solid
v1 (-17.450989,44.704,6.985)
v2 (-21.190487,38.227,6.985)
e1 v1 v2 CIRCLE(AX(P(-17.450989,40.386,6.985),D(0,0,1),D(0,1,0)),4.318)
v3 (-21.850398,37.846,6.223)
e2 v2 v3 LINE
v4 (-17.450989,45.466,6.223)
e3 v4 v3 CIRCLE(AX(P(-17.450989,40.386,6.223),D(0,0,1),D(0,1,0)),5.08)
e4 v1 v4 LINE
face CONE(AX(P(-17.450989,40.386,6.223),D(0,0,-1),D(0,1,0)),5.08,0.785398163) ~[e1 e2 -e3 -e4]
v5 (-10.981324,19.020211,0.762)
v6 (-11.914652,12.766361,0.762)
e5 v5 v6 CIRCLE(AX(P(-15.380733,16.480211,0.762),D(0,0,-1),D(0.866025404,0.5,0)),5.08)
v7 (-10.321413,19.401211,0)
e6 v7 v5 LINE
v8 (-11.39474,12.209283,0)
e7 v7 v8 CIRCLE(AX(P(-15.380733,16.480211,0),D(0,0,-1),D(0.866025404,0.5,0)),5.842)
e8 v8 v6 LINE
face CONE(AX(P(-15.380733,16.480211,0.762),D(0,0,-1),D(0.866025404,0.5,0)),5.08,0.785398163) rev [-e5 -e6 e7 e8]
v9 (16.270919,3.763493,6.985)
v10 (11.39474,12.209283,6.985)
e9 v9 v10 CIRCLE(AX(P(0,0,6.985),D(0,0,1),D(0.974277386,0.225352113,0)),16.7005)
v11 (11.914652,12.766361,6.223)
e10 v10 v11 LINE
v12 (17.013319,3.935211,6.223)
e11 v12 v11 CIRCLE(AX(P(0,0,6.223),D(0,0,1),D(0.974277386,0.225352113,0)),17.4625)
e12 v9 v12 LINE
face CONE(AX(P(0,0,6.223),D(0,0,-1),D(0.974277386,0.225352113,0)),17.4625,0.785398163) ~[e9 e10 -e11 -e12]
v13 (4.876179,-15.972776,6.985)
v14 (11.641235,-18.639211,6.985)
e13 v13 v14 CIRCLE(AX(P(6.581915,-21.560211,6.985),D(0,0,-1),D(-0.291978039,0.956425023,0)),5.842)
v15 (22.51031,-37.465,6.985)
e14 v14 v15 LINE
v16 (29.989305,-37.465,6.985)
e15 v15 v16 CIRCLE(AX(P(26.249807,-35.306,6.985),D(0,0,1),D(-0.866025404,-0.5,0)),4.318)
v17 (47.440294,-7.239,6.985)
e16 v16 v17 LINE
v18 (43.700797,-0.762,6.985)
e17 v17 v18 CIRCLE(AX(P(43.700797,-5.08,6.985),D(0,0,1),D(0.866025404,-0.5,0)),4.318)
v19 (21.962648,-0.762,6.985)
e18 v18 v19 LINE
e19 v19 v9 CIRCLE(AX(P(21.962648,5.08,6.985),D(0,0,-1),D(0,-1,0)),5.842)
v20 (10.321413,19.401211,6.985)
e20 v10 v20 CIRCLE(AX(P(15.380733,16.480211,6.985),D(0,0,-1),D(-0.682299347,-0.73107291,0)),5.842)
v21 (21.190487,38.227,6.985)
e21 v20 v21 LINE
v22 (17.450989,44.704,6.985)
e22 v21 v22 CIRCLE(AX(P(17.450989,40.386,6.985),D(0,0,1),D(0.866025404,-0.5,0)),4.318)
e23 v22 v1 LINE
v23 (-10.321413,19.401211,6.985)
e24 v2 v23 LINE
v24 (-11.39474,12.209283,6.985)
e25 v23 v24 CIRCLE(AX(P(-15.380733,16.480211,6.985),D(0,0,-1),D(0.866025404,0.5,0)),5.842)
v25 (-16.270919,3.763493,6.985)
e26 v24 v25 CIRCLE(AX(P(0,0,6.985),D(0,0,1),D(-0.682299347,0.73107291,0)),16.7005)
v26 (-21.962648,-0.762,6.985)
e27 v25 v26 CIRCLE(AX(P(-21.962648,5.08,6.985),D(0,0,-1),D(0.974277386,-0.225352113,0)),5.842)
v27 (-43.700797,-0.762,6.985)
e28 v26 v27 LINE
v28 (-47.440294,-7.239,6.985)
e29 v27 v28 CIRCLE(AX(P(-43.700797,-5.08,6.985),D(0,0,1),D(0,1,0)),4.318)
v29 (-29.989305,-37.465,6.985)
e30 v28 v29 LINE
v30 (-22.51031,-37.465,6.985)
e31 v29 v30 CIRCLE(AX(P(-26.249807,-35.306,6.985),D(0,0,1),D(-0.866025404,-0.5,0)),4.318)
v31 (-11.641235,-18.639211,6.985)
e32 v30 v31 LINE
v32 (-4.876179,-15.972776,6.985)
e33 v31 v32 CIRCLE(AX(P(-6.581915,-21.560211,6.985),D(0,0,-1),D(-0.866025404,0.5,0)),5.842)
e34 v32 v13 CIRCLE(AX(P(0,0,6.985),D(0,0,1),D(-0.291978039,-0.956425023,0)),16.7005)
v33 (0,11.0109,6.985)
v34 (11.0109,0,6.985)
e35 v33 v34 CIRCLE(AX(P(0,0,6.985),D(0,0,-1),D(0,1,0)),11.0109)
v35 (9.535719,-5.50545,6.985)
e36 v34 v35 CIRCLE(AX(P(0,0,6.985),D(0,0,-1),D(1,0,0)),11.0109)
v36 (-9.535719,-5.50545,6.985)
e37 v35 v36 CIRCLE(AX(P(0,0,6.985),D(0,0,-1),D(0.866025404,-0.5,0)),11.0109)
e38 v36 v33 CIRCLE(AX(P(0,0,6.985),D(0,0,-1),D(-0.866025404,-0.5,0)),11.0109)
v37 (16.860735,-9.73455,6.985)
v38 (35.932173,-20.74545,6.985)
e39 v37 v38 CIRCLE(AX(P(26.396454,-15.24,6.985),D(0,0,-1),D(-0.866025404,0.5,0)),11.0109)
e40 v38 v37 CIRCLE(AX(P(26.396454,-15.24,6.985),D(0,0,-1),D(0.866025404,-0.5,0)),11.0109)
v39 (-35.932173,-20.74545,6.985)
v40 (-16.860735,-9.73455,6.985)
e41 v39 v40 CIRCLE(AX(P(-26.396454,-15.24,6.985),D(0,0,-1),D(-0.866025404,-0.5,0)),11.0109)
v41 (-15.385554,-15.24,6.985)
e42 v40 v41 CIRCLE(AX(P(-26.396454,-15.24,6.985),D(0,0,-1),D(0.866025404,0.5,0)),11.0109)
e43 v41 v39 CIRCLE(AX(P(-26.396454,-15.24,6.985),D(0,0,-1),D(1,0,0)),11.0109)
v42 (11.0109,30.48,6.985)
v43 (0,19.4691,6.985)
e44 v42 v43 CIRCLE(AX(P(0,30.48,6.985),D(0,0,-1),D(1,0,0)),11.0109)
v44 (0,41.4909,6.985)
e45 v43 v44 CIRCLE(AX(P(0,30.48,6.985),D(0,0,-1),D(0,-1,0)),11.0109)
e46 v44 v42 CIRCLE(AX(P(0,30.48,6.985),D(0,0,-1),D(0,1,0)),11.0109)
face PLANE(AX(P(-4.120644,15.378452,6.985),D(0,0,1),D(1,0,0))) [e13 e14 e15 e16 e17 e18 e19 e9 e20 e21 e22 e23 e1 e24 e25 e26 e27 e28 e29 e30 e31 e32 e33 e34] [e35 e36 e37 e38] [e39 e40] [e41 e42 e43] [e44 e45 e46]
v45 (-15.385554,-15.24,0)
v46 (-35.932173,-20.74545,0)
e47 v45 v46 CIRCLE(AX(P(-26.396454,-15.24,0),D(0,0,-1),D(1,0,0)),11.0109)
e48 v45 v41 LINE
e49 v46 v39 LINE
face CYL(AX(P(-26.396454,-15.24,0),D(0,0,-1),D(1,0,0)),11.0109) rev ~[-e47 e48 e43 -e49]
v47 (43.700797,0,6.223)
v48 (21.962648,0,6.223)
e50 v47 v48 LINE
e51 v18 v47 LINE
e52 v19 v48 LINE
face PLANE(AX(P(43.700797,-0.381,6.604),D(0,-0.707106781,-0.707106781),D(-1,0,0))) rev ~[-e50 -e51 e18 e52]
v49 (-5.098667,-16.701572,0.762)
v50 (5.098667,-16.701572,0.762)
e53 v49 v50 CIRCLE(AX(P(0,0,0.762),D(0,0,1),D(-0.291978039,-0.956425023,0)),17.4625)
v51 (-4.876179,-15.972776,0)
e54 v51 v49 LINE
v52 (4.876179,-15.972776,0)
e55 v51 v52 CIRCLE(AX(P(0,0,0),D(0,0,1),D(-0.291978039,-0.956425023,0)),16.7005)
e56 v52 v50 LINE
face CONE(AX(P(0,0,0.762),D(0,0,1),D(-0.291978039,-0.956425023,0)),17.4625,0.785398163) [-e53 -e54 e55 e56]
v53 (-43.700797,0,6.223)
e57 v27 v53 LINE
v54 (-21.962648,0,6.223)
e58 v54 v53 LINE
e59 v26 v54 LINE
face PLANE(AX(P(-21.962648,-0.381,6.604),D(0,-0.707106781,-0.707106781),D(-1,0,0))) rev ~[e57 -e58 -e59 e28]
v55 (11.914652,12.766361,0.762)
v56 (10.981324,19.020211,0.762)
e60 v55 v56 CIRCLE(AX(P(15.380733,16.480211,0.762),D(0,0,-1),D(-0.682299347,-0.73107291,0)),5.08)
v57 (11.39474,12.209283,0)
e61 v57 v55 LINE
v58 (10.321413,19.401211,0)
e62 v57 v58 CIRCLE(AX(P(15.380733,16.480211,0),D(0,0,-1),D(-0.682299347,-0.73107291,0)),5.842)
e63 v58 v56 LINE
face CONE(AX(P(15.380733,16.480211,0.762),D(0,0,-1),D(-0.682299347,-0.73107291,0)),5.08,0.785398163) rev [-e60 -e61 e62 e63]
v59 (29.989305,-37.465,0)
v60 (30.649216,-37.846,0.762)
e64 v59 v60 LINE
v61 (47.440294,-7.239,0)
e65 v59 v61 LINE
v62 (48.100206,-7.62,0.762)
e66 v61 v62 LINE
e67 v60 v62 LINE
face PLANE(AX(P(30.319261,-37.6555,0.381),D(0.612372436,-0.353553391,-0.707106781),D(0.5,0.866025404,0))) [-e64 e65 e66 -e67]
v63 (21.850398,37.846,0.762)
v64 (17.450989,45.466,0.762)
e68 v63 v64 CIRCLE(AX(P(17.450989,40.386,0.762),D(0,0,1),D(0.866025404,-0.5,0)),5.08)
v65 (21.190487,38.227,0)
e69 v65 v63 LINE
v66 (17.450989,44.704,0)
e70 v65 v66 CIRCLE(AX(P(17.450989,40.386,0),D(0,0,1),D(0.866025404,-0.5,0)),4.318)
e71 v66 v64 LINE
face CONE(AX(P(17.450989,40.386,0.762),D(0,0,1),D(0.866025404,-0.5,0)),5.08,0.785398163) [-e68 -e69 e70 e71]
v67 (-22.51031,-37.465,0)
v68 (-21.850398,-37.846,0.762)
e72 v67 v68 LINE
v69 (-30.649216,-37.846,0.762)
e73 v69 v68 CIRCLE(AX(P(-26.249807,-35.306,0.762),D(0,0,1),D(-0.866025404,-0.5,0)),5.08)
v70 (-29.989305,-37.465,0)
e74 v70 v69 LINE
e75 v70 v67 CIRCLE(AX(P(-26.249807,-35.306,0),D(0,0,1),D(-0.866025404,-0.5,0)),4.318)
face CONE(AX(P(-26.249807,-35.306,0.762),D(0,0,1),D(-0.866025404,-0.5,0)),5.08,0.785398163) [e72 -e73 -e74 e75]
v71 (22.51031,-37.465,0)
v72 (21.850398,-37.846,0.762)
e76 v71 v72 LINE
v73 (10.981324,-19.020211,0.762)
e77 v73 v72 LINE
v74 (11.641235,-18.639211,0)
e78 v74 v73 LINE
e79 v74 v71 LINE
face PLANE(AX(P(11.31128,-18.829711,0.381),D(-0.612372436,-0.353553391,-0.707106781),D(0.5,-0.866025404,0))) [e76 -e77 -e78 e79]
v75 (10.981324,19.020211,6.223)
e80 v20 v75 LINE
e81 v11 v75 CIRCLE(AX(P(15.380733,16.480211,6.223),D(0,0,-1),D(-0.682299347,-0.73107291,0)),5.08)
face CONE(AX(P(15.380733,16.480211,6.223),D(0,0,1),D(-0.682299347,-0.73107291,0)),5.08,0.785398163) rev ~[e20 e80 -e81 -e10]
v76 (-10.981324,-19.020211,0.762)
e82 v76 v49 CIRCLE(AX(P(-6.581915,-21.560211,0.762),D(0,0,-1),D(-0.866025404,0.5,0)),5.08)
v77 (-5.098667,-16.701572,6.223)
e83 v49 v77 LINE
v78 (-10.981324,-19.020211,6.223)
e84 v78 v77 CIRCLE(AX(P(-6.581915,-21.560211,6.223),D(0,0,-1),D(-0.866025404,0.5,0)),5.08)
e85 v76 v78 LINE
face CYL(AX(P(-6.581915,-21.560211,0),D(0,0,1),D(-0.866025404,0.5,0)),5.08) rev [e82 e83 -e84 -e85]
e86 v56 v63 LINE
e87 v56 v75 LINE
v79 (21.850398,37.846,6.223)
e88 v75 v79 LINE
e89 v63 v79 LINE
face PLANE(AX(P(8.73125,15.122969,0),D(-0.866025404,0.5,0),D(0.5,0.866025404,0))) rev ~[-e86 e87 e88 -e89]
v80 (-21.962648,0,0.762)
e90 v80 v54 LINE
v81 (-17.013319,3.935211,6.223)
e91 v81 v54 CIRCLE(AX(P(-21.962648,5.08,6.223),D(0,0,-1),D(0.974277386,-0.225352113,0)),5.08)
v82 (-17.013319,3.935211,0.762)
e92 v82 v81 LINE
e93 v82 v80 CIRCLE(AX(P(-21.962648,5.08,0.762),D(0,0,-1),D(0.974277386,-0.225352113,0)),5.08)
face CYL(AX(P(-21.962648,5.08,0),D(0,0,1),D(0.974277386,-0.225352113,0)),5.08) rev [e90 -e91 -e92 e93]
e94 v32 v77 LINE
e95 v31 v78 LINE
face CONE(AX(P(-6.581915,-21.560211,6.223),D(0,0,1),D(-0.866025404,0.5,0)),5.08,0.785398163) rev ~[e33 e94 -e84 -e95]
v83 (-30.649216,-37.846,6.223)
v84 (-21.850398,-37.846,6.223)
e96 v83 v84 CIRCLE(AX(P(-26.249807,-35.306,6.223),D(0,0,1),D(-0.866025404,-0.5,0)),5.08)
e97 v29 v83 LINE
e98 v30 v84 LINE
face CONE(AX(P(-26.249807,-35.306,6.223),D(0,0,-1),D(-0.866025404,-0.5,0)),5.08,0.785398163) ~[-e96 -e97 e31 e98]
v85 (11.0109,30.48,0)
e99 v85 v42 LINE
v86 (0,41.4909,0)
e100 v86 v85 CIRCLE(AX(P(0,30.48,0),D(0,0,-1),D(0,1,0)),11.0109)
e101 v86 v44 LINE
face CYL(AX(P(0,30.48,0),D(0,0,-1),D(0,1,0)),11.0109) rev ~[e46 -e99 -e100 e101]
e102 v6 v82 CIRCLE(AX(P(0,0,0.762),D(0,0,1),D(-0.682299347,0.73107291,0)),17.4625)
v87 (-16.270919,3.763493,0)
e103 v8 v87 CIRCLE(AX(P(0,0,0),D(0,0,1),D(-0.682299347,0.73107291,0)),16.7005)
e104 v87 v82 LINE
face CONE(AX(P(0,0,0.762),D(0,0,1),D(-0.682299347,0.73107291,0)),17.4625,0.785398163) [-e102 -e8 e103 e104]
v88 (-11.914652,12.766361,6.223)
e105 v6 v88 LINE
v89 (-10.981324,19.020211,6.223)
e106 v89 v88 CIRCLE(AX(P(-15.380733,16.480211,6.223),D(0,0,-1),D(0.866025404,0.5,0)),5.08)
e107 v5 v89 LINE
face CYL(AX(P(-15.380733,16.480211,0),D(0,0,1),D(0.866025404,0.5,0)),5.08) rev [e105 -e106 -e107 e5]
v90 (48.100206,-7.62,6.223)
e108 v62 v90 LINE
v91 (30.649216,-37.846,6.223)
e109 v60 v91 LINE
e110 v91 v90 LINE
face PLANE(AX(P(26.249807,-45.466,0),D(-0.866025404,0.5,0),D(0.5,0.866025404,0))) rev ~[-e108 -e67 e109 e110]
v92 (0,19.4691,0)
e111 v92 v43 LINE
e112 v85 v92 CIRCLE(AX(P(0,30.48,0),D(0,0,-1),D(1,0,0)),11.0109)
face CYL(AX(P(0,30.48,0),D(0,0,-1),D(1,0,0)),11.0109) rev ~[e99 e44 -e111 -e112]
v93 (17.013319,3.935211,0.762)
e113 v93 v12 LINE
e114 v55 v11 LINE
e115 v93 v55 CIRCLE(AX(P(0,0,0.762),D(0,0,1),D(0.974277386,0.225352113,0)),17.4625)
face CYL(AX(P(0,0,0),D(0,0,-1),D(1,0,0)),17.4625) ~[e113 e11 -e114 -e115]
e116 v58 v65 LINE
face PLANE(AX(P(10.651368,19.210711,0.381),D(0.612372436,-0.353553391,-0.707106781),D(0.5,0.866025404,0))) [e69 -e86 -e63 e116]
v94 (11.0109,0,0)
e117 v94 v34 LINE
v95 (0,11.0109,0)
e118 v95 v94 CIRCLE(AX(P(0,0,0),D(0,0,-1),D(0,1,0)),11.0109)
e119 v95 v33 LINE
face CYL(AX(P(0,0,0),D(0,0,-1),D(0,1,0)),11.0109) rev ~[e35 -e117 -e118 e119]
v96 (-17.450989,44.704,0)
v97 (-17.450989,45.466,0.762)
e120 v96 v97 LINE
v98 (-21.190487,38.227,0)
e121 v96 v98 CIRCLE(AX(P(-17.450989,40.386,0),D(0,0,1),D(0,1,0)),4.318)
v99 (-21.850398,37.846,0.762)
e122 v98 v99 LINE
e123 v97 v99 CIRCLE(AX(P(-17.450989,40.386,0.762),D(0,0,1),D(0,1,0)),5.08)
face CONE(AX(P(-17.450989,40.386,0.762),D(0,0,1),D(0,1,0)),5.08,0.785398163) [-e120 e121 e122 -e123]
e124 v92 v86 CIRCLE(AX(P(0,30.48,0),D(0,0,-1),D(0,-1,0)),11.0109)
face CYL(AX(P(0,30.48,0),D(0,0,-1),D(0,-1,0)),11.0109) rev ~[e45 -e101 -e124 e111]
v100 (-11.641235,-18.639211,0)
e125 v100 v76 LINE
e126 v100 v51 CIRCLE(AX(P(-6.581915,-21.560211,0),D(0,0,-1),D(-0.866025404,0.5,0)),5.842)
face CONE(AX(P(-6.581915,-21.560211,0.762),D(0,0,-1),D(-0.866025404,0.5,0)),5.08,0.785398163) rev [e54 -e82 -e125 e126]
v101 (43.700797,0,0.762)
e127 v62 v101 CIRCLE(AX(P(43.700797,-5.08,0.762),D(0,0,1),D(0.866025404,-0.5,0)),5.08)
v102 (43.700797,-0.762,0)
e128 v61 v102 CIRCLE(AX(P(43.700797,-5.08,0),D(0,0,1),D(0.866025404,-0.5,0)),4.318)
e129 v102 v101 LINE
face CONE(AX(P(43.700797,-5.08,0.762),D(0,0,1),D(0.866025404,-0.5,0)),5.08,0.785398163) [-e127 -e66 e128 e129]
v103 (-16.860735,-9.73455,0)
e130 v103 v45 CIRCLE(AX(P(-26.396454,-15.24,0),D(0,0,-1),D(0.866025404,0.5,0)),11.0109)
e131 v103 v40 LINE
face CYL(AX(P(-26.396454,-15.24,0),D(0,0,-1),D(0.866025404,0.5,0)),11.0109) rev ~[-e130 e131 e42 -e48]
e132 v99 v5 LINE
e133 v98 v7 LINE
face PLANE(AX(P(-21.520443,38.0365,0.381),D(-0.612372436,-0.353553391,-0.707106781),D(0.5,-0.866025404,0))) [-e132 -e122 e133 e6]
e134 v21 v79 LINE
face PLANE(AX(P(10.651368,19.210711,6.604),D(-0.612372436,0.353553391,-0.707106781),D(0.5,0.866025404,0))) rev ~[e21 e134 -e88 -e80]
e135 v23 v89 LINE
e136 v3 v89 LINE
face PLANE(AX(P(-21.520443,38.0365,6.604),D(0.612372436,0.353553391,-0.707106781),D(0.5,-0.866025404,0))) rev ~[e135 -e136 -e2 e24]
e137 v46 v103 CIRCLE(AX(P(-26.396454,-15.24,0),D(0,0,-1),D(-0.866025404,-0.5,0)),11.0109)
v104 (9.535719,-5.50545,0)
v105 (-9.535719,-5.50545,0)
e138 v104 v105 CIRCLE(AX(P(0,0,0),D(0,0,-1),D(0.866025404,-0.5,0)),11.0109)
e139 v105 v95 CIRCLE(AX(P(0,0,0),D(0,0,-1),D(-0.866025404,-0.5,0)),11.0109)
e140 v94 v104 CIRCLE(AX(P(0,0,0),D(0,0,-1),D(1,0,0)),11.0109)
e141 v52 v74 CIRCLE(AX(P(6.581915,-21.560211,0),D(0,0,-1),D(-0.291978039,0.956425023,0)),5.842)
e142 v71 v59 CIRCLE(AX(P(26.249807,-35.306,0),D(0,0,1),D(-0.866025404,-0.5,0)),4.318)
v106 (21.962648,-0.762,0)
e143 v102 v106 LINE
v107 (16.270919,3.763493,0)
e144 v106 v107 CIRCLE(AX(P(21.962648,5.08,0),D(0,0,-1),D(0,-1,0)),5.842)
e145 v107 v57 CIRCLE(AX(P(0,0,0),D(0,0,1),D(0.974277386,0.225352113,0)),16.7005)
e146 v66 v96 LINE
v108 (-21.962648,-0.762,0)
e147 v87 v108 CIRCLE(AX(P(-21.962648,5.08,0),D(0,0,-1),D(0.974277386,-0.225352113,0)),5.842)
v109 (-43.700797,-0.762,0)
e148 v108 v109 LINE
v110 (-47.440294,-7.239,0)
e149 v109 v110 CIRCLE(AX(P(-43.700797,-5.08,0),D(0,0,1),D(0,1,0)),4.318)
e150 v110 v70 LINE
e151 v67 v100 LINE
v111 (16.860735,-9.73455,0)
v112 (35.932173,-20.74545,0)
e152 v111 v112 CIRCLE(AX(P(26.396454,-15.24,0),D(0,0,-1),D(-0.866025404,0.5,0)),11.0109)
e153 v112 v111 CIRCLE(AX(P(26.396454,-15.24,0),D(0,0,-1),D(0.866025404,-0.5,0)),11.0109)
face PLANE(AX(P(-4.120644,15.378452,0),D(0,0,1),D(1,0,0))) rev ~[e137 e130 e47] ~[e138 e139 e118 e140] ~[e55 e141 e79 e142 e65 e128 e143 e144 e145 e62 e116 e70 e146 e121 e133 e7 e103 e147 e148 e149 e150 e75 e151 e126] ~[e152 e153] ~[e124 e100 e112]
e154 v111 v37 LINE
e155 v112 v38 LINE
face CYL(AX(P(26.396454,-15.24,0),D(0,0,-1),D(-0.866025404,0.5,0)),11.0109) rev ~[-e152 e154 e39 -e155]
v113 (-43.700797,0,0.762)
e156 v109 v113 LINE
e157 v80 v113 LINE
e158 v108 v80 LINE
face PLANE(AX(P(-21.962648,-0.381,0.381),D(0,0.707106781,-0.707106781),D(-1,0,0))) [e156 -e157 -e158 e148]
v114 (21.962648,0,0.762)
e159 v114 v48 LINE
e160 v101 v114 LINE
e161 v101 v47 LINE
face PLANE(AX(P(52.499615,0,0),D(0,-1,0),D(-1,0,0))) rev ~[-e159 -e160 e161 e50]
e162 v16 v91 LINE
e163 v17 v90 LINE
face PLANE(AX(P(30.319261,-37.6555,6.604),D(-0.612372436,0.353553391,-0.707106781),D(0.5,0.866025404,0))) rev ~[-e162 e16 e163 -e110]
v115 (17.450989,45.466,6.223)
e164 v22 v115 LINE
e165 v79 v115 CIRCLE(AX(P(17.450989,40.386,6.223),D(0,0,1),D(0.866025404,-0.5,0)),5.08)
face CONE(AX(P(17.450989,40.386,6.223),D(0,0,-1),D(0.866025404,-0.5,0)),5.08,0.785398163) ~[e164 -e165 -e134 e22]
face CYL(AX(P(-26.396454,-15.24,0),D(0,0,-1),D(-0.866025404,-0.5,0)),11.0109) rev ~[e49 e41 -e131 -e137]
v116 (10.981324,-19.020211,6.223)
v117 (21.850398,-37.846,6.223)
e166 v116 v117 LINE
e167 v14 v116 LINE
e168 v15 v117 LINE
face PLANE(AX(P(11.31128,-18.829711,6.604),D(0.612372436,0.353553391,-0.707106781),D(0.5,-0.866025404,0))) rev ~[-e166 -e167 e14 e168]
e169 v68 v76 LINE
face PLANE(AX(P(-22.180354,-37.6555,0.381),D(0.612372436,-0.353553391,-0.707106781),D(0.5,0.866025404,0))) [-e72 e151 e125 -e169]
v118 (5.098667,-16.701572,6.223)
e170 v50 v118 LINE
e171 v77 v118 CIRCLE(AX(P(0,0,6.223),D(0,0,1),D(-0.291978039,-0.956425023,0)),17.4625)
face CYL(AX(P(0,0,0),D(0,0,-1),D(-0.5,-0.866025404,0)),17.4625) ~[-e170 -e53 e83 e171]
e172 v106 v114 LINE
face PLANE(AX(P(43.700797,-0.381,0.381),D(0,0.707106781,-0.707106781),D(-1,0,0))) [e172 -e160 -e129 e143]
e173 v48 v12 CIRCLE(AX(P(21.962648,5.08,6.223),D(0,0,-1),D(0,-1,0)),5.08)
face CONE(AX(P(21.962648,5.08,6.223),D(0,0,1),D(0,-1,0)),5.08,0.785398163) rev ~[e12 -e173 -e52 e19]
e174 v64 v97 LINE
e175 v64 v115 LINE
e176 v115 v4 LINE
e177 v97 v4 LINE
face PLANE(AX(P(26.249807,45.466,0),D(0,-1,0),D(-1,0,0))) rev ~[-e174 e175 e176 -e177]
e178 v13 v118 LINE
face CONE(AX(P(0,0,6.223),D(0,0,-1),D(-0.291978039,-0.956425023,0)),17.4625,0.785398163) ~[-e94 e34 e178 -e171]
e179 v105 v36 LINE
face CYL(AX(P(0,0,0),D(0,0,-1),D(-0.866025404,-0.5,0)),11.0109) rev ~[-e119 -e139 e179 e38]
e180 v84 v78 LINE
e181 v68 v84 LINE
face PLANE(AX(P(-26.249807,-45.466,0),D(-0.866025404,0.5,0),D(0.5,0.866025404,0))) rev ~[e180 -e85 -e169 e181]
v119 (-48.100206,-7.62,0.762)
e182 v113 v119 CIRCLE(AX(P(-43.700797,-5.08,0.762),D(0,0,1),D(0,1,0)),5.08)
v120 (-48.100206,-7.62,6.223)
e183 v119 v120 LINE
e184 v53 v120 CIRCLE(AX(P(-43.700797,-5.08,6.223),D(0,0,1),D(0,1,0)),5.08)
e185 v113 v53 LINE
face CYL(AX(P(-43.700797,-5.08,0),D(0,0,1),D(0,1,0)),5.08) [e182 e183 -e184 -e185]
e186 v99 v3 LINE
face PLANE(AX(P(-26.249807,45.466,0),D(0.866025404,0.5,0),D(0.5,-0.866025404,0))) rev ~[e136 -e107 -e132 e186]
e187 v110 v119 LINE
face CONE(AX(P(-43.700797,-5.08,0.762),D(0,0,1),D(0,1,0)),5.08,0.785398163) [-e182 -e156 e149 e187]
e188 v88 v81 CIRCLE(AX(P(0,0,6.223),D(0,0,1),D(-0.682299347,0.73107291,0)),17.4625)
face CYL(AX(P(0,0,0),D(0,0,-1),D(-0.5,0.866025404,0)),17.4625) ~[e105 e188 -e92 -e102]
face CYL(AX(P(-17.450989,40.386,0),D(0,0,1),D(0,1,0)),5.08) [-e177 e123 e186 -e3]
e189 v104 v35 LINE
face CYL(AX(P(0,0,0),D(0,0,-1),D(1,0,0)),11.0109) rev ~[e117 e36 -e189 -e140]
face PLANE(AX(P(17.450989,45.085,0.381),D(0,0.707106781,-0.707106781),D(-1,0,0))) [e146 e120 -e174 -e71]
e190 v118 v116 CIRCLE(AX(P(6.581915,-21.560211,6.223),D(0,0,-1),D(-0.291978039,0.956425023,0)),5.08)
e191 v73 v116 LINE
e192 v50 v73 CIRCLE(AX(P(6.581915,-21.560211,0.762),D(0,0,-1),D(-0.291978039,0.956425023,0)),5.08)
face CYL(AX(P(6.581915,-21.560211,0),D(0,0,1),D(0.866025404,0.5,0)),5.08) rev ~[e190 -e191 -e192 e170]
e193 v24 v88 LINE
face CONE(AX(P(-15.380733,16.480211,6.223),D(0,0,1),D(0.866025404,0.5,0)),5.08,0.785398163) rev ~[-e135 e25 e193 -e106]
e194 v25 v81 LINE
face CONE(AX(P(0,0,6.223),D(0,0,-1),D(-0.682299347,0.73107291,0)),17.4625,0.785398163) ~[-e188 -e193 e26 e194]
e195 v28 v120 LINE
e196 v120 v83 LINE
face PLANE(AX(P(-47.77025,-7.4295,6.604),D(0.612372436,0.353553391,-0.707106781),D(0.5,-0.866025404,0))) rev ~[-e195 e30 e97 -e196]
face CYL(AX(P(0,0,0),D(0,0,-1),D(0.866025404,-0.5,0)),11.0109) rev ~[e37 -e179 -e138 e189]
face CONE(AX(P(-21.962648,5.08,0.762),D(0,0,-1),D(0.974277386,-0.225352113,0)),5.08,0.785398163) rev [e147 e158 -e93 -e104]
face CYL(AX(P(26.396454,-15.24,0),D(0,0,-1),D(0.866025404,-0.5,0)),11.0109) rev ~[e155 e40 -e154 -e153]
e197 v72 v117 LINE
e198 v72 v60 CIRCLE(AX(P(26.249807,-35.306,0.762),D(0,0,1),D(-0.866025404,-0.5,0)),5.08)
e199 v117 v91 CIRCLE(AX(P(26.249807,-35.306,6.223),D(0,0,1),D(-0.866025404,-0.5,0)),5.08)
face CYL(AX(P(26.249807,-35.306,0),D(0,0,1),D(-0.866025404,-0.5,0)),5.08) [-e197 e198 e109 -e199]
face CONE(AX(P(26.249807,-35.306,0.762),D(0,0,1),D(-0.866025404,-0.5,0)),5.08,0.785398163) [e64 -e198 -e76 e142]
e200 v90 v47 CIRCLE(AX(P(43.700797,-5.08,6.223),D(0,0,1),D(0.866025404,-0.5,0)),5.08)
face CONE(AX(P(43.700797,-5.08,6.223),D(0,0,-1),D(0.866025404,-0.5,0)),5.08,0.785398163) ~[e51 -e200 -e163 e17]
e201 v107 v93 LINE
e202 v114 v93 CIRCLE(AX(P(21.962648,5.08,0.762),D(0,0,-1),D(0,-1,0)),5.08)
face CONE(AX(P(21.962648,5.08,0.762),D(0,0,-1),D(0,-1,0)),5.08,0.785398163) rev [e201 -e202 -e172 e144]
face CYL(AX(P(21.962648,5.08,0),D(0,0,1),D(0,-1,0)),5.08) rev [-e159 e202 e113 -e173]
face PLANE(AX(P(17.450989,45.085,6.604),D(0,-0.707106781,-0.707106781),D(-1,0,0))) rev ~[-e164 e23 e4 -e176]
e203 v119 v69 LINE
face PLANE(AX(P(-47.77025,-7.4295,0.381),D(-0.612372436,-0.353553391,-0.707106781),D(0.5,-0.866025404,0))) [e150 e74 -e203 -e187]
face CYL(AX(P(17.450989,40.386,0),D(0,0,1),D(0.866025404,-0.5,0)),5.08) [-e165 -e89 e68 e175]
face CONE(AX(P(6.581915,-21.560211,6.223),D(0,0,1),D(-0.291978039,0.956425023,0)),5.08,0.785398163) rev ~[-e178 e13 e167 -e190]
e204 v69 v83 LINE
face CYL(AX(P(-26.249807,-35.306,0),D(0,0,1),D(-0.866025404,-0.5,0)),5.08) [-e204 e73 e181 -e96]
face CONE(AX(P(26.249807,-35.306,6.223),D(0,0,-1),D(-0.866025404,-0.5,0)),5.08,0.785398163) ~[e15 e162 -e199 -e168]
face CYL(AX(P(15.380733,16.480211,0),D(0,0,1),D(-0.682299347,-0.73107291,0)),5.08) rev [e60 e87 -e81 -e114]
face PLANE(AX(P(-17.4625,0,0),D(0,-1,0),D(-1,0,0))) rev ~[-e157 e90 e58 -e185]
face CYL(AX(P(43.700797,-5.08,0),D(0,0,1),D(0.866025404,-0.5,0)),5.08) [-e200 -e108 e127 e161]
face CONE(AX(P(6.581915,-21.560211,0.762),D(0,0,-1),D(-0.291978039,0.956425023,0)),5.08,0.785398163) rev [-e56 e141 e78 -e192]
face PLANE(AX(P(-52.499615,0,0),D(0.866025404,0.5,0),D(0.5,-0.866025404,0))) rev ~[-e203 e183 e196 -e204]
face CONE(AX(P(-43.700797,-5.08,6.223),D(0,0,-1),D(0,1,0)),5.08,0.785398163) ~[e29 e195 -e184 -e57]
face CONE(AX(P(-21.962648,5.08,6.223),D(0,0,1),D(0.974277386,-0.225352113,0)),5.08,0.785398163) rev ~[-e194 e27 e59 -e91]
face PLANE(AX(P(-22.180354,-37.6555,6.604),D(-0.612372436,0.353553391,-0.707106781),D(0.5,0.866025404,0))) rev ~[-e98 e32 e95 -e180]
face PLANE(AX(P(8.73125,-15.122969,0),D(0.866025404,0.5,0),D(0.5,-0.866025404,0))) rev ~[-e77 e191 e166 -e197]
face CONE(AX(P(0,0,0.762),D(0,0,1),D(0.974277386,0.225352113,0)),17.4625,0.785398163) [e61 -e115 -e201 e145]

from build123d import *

# Parameters (mm, degrees)
F1_DEPTH = 6.985
F2_R     = 5.08
F3_SIZE  = 0.762


with BuildPart() as f1:
    # F0 (on Top) → F1 (new body)
    with BuildSketch(Plane.XY):
        with BuildLine():
            ThreePointArc((-7.41045, 12.8352759069), (-3.8359311856, 14.3158900788), (0, 14.8209))
            Line((0, 14.8209), (0, 17.4625))
            ThreePointArc((0, 17.4625), (-4.5196275751, 16.8674797416), (-8.73125, 15.1229686136))
            Line((-8.73125, 15.1229686136), (-7.41045, 12.8352759069))
        make_face()
        with BuildLine():
            Line((0, 17.4625), (0, 14.8209))
            ThreePointArc((0, 14.8209), (3.8359311856, 14.3158900788), (7.41045, 12.8352759069))
            Line((7.41045, 12.8352759069), (8.73125, 15.1229686136))
            ThreePointArc((8.73125, 15.1229686136), (4.5196275751, 16.8674797416), (0, 17.4625))
        make_face()
        with BuildLine():
            ThreePointArc((14.8209, 0), (14.3158900788, -3.8359311856), (12.8352759069, -7.41045))
            Line((12.8352759069, -7.41045), (15.1229686136, -8.73125))
            ThreePointArc((15.1229686136, -8.73125), (16.8674797416, -4.5196275751), (17.4625, 0))
            Line((17.4625, 0), (14.8209, 0))
        make_face()
        with BuildLine():
            Line((15.1229686136, -8.73125), (12.8352759069, -7.41045))
            ThreePointArc((12.8352759069, -7.41045), (10.4799588933, -10.4799588933), (7.41045, -12.8352759069))
            Line((7.41045, -12.8352759069), (8.73125, -15.1229686136))
            ThreePointArc((8.73125, -15.1229686136), (12.3478521665, -12.3478521665), (15.1229686136, -8.73125))
        make_face()
        with BuildLine():
            ThreePointArc((-7.41045, -12.8352759069), (-10.4799588933, -10.4799588933), (-12.8352759069, -7.41045))
            Line((-12.8352759069, -7.41045), (-15.1229686136, -8.73125))
            ThreePointArc((-15.1229686136, -8.73125), (-12.3478521665, -12.3478521665), (-8.73125, -15.1229686136))
            Line((-8.73125, -15.1229686136), (-7.41045, -12.8352759069))
        make_face()
        with BuildLine():
            Line((-15.1229686136, -8.73125), (-12.8352759069, -7.41045))
            ThreePointArc((-12.8352759069, -7.41045), (-14.3158900788, -3.8359311856), (-14.8209, 0))
            Line((-14.8209, 0), (-17.4625, 0))
            ThreePointArc((-17.4625, 0), (-16.8674797416, -4.5196275751), (-15.1229686136, -8.73125))
        make_face()
        with BuildLine():
            ThreePointArc((-8.73125, 15.1229686136), (-4.5196275751, 16.8674797416), (0, 17.4625))
            Line((0, 17.4625), (0, 19.4691))
            ThreePointArc((0, 19.4691), (-11.0109, 30.48), (0, 41.4909))
            Line((0, 41.4909), (0, 45.466))
            Line((0, 45.466), (-26.249807339, 45.466))
            Line((-26.249807339, 45.466), (-8.73125, 15.1229686136))
        make_face()
        with BuildLine():
            Line((0, 19.4691), (0, 17.4625))
            ThreePointArc((0, 17.4625), (4.5196275751, 16.8674797416), (8.73125, 15.1229686136))
            Line((8.73125, 15.1229686136), (26.249807339, 45.466))
            Line((26.249807339, 45.466), (0, 45.466))
            Line((0, 45.466), (0, 41.4909))
            ThreePointArc((0, 41.4909), (7.785882057, 38.265882057), (11.0109, 30.48))
            ThreePointArc((11.0109, 30.48), (7.785882057, 22.694117943), (0, 19.4691))
        make_face()
        with BuildLine():
            Line((8.73125, 15.1229686136), (7.41045, 12.8352759069))
            ThreePointArc((7.41045, 12.8352759069), (12.8352759069, 7.41045), (14.8209, 0))
            Line((14.8209, 0), (17.4625, 0))
            ThreePointArc((17.4625, 0), (15.1229686136, 8.73125), (8.73125, 15.1229686136))
        make_face()
        with BuildLine():
            ThreePointArc((-14.8209, 0), (-12.8352759069, 7.41045), (-7.41045, 12.8352759069))
            Line((-7.41045, 12.8352759069), (-8.73125, 15.1229686136))
            ThreePointArc((-8.73125, 15.1229686136), (-15.1229686136, 8.73125), (-17.4625, 0))
            Line((-17.4625, 0), (-14.8209, 0))
        make_face()
        with BuildLine():
            ThreePointArc((17.4625, 0), (16.8674797416, -4.5196275751), (15.1229686136, -8.73125))
            Line((15.1229686136, -8.73125), (16.8607351888, -9.73455))
            ThreePointArc((16.8607351888, -9.73455), (29.2462849311, -4.6042873193), (37.4073543073, -15.24))
            ThreePointArc((37.4073543073, -15.24), (37.032166988, -18.0898306237), (35.9321734259, -20.74545))
            Line((35.9321734259, -20.74545), (39.3747110085, -22.733))
            Line((39.3747110085, -22.733), (52.499614678, 0))
            Line((52.499614678, 0), (17.4625, 0))
        make_face()
        with BuildLine():
            Line((16.8607351888, -9.73455), (15.1229686136, -8.73125))
            ThreePointArc((15.1229686136, -8.73125), (12.3478521665, -12.3478521665), (8.73125, -15.1229686136))
            Line((8.73125, -15.1229686136), (26.249807339, -45.466))
            Line((26.249807339, -45.466), (39.3747110085, -22.733))
            Line((39.3747110085, -22.733), (35.9321734259, -20.74545))
            ThreePointArc((35.9321734259, -20.74545), (20.8910043073, -24.7757191185), (16.8607351888, -9.73455))
        make_face()
        with BuildLine():
            Line((8.73125, -15.1229686136), (7.41045, -12.8352759069))
            ThreePointArc((7.41045, -12.8352759069), (0, -14.8209), (-7.41045, -12.8352759069))
            Line((-7.41045, -12.8352759069), (-8.73125, -15.1229686136))
            ThreePointArc((-8.73125, -15.1229686136), (0, -17.4625), (8.73125, -15.1229686136))
        make_face()
        with BuildLine():
            ThreePointArc((-8.73125, -15.1229686136), (-12.3478521665, -12.3478521665), (-15.1229686136, -8.73125))
            Line((-15.1229686136, -8.73125), (-16.8607351888, -9.73455))
            ThreePointArc((-16.8607351888, -9.73455), (-15.7607416267, -12.3901693763), (-15.3855543073, -15.24))
            ThreePointArc((-15.3855543073, -15.24), (-23.5466236836, -25.8757126807), (-35.9321734259, -20.74545))
            Line((-35.9321734259, -20.74545), (-39.3747110085, -22.733))
            Line((-39.3747110085, -22.733), (-26.249807339, -45.466))
            Line((-26.249807339, -45.466), (-8.73125, -15.1229686136))
        make_face()
        with BuildLine():
            Line((-16.8607351888, -9.73455), (-15.1229686136, -8.73125))
            ThreePointArc((-15.1229686136, -8.73125), (-16.8674797416, -4.5196275751), (-17.4625, 0))
            Line((-17.4625, 0), (-52.499614678, 0))
            Line((-52.499614678, 0), (-39.3747110085, -22.733))
            Line((-39.3747110085, -22.733), (-35.9321734259, -20.74545))
            ThreePointArc((-35.9321734259, -20.74545), (-31.9019043073, -5.7042808815), (-16.8607351888, -9.73455))
        make_face()
        with BuildLine():
            ThreePointArc((-9.5357191185, -5.50545), (-9.5357191185, 5.50545), (0, 11.0109))
            Line((0, 11.0109), (0, 14.8209))
            ThreePointArc((0, 14.8209), (-3.8359311856, 14.3158900788), (-7.41045, 12.8352759069))
            ThreePointArc((-7.41045, 12.8352759069), (-12.8352759069, 7.41045), (-14.8209, 0))
            ThreePointArc((-14.8209, 0), (-14.3158900788, -3.8359311856), (-12.8352759069, -7.41045))
            Line((-12.8352759069, -7.41045), (-9.5357191185, -5.50545))
        make_face()
        with BuildLine():
            ThreePointArc((0, 11.0109), (7.785882057, 7.785882057), (11.0109, 0))
            ThreePointArc((11.0109, 0), (10.6357126807, -2.8498306237), (9.5357191185, -5.50545))
            Line((9.5357191185, -5.50545), (12.8352759069, -7.41045))
            ThreePointArc((12.8352759069, -7.41045), (14.3158900788, -3.8359311856), (14.8209, 0))
            ThreePointArc((14.8209, 0), (12.8352759069, 7.41045), (7.41045, 12.8352759069))
            ThreePointArc((7.41045, 12.8352759069), (3.8359311856, 14.3158900788), (0, 14.8209))
            Line((0, 14.8209), (0, 11.0109))
        make_face()
        with BuildLine():
            Line((12.8352759069, -7.41045), (9.5357191185, -5.50545))
            ThreePointArc((9.5357191185, -5.50545), (0, -11.0109), (-9.5357191185, -5.50545))
            Line((-9.5357191185, -5.50545), (-12.8352759069, -7.41045))
            ThreePointArc((-12.8352759069, -7.41045), (-10.4799588933, -10.4799588933), (-7.41045, -12.8352759069))
            ThreePointArc((-7.41045, -12.8352759069), (0, -14.8209), (7.41045, -12.8352759069))
            ThreePointArc((7.41045, -12.8352759069), (10.4799588933, -10.4799588933), (12.8352759069, -7.41045))
        make_face()
    extrude(amount=F1_DEPTH)

    # F2
    f2_edges = [f1.edges().sort_by_distance(p)[0] for p in [
        (8.73125, -15.122969, 3.4925),
        (26.249807, -45.466, 3.4925),
        (52.499615, 0, 3.4925),
        (17.4625, 0, 3.4925),
        (8.73125, 15.122969, 3.4925),
        (26.249807, 45.466, 3.4925),
        (-26.249807, 45.466, 3.4925),
        (-8.73125, 15.122969, 3.4925),
        (-17.4625, 0, 3.4925),
        (-52.499615, 0, 3.4925),
        (-26.249807, -45.466, 3.4925),
        (-8.73125, -15.122969, 3.4925),
    ]]
    fillet(f2_edges, radius=F2_R)

    # F3
    f3_edges = [f1.edges().sort_by_distance(p)[0] for p in [
        (-32.831722, 0, 6.985),
        (-16.415861, 28.433106, 6.985),
        (32.831722, 0, 6.985),
        (16.415861, 28.433106, 6.985),
        (0, 45.466, 6.985),
        (-39.374711, -22.733, 6.985),
        (39.374711, -22.733, 6.985),
        (16.415861, -28.433106, 6.985),
        (-16.415861, -28.433106, 6.985),
        (-16.415861, -28.433106, 0),
        (-32.831722, 0, 0),
        (-16.415861, 28.433106, 0),
        (16.415861, 28.433106, 0),
        (32.831722, 0, 0),
        (16.415861, -28.433106, 0),
        (39.374711, -22.733, 0),
        (0, 45.466, 0),
        (-39.374711, -22.733, 0),
        (8.444714, -16.834073, 0),
        (26.249807, -40.386, 0),
        (0, -17.4625, 0),
        (-8.444714, -16.834073, 0),
        (48.100206, -2.54, 0),
        (-26.249807, -40.386, 0),
        (18.801092, 1.1037, 0),
        (15.122969, 8.73125, 0),
        (-48.100206, -2.54, 0),
        (10.356378, 15.730373, 0),
        (-18.801092, 1.1037, 0),
        (21.850398, 42.926, 0),
        (-15.122969, 8.73125, 0),
        (-10.356378, 15.730373, 0),
        (-21.850398, 42.926, 0),
        (8.444714, -16.834073, 6.985),
        (26.249807, -40.386, 6.985),
        (0, -17.4625, 6.985),
        (-8.444714, -16.834073, 6.985),
        (48.100206, -2.54, 6.985),
        (-26.249807, -40.386, 6.985),
        (18.801092, 1.1037, 6.985),
        (15.122969, 8.73125, 6.985),
        (-48.100206, -2.54, 6.985),
        (10.356378, 15.730373, 6.985),
        (-18.801092, 1.1037, 6.985),
        (21.850398, 42.926, 6.985),
        (-15.122969, 8.73125, 6.985),
        (-10.356378, 15.730373, 6.985),
        (-21.850398, 42.926, 6.985),
    ]]
    chamfer(f3_edges, length=F3_SIZE)


solid = f1.part
